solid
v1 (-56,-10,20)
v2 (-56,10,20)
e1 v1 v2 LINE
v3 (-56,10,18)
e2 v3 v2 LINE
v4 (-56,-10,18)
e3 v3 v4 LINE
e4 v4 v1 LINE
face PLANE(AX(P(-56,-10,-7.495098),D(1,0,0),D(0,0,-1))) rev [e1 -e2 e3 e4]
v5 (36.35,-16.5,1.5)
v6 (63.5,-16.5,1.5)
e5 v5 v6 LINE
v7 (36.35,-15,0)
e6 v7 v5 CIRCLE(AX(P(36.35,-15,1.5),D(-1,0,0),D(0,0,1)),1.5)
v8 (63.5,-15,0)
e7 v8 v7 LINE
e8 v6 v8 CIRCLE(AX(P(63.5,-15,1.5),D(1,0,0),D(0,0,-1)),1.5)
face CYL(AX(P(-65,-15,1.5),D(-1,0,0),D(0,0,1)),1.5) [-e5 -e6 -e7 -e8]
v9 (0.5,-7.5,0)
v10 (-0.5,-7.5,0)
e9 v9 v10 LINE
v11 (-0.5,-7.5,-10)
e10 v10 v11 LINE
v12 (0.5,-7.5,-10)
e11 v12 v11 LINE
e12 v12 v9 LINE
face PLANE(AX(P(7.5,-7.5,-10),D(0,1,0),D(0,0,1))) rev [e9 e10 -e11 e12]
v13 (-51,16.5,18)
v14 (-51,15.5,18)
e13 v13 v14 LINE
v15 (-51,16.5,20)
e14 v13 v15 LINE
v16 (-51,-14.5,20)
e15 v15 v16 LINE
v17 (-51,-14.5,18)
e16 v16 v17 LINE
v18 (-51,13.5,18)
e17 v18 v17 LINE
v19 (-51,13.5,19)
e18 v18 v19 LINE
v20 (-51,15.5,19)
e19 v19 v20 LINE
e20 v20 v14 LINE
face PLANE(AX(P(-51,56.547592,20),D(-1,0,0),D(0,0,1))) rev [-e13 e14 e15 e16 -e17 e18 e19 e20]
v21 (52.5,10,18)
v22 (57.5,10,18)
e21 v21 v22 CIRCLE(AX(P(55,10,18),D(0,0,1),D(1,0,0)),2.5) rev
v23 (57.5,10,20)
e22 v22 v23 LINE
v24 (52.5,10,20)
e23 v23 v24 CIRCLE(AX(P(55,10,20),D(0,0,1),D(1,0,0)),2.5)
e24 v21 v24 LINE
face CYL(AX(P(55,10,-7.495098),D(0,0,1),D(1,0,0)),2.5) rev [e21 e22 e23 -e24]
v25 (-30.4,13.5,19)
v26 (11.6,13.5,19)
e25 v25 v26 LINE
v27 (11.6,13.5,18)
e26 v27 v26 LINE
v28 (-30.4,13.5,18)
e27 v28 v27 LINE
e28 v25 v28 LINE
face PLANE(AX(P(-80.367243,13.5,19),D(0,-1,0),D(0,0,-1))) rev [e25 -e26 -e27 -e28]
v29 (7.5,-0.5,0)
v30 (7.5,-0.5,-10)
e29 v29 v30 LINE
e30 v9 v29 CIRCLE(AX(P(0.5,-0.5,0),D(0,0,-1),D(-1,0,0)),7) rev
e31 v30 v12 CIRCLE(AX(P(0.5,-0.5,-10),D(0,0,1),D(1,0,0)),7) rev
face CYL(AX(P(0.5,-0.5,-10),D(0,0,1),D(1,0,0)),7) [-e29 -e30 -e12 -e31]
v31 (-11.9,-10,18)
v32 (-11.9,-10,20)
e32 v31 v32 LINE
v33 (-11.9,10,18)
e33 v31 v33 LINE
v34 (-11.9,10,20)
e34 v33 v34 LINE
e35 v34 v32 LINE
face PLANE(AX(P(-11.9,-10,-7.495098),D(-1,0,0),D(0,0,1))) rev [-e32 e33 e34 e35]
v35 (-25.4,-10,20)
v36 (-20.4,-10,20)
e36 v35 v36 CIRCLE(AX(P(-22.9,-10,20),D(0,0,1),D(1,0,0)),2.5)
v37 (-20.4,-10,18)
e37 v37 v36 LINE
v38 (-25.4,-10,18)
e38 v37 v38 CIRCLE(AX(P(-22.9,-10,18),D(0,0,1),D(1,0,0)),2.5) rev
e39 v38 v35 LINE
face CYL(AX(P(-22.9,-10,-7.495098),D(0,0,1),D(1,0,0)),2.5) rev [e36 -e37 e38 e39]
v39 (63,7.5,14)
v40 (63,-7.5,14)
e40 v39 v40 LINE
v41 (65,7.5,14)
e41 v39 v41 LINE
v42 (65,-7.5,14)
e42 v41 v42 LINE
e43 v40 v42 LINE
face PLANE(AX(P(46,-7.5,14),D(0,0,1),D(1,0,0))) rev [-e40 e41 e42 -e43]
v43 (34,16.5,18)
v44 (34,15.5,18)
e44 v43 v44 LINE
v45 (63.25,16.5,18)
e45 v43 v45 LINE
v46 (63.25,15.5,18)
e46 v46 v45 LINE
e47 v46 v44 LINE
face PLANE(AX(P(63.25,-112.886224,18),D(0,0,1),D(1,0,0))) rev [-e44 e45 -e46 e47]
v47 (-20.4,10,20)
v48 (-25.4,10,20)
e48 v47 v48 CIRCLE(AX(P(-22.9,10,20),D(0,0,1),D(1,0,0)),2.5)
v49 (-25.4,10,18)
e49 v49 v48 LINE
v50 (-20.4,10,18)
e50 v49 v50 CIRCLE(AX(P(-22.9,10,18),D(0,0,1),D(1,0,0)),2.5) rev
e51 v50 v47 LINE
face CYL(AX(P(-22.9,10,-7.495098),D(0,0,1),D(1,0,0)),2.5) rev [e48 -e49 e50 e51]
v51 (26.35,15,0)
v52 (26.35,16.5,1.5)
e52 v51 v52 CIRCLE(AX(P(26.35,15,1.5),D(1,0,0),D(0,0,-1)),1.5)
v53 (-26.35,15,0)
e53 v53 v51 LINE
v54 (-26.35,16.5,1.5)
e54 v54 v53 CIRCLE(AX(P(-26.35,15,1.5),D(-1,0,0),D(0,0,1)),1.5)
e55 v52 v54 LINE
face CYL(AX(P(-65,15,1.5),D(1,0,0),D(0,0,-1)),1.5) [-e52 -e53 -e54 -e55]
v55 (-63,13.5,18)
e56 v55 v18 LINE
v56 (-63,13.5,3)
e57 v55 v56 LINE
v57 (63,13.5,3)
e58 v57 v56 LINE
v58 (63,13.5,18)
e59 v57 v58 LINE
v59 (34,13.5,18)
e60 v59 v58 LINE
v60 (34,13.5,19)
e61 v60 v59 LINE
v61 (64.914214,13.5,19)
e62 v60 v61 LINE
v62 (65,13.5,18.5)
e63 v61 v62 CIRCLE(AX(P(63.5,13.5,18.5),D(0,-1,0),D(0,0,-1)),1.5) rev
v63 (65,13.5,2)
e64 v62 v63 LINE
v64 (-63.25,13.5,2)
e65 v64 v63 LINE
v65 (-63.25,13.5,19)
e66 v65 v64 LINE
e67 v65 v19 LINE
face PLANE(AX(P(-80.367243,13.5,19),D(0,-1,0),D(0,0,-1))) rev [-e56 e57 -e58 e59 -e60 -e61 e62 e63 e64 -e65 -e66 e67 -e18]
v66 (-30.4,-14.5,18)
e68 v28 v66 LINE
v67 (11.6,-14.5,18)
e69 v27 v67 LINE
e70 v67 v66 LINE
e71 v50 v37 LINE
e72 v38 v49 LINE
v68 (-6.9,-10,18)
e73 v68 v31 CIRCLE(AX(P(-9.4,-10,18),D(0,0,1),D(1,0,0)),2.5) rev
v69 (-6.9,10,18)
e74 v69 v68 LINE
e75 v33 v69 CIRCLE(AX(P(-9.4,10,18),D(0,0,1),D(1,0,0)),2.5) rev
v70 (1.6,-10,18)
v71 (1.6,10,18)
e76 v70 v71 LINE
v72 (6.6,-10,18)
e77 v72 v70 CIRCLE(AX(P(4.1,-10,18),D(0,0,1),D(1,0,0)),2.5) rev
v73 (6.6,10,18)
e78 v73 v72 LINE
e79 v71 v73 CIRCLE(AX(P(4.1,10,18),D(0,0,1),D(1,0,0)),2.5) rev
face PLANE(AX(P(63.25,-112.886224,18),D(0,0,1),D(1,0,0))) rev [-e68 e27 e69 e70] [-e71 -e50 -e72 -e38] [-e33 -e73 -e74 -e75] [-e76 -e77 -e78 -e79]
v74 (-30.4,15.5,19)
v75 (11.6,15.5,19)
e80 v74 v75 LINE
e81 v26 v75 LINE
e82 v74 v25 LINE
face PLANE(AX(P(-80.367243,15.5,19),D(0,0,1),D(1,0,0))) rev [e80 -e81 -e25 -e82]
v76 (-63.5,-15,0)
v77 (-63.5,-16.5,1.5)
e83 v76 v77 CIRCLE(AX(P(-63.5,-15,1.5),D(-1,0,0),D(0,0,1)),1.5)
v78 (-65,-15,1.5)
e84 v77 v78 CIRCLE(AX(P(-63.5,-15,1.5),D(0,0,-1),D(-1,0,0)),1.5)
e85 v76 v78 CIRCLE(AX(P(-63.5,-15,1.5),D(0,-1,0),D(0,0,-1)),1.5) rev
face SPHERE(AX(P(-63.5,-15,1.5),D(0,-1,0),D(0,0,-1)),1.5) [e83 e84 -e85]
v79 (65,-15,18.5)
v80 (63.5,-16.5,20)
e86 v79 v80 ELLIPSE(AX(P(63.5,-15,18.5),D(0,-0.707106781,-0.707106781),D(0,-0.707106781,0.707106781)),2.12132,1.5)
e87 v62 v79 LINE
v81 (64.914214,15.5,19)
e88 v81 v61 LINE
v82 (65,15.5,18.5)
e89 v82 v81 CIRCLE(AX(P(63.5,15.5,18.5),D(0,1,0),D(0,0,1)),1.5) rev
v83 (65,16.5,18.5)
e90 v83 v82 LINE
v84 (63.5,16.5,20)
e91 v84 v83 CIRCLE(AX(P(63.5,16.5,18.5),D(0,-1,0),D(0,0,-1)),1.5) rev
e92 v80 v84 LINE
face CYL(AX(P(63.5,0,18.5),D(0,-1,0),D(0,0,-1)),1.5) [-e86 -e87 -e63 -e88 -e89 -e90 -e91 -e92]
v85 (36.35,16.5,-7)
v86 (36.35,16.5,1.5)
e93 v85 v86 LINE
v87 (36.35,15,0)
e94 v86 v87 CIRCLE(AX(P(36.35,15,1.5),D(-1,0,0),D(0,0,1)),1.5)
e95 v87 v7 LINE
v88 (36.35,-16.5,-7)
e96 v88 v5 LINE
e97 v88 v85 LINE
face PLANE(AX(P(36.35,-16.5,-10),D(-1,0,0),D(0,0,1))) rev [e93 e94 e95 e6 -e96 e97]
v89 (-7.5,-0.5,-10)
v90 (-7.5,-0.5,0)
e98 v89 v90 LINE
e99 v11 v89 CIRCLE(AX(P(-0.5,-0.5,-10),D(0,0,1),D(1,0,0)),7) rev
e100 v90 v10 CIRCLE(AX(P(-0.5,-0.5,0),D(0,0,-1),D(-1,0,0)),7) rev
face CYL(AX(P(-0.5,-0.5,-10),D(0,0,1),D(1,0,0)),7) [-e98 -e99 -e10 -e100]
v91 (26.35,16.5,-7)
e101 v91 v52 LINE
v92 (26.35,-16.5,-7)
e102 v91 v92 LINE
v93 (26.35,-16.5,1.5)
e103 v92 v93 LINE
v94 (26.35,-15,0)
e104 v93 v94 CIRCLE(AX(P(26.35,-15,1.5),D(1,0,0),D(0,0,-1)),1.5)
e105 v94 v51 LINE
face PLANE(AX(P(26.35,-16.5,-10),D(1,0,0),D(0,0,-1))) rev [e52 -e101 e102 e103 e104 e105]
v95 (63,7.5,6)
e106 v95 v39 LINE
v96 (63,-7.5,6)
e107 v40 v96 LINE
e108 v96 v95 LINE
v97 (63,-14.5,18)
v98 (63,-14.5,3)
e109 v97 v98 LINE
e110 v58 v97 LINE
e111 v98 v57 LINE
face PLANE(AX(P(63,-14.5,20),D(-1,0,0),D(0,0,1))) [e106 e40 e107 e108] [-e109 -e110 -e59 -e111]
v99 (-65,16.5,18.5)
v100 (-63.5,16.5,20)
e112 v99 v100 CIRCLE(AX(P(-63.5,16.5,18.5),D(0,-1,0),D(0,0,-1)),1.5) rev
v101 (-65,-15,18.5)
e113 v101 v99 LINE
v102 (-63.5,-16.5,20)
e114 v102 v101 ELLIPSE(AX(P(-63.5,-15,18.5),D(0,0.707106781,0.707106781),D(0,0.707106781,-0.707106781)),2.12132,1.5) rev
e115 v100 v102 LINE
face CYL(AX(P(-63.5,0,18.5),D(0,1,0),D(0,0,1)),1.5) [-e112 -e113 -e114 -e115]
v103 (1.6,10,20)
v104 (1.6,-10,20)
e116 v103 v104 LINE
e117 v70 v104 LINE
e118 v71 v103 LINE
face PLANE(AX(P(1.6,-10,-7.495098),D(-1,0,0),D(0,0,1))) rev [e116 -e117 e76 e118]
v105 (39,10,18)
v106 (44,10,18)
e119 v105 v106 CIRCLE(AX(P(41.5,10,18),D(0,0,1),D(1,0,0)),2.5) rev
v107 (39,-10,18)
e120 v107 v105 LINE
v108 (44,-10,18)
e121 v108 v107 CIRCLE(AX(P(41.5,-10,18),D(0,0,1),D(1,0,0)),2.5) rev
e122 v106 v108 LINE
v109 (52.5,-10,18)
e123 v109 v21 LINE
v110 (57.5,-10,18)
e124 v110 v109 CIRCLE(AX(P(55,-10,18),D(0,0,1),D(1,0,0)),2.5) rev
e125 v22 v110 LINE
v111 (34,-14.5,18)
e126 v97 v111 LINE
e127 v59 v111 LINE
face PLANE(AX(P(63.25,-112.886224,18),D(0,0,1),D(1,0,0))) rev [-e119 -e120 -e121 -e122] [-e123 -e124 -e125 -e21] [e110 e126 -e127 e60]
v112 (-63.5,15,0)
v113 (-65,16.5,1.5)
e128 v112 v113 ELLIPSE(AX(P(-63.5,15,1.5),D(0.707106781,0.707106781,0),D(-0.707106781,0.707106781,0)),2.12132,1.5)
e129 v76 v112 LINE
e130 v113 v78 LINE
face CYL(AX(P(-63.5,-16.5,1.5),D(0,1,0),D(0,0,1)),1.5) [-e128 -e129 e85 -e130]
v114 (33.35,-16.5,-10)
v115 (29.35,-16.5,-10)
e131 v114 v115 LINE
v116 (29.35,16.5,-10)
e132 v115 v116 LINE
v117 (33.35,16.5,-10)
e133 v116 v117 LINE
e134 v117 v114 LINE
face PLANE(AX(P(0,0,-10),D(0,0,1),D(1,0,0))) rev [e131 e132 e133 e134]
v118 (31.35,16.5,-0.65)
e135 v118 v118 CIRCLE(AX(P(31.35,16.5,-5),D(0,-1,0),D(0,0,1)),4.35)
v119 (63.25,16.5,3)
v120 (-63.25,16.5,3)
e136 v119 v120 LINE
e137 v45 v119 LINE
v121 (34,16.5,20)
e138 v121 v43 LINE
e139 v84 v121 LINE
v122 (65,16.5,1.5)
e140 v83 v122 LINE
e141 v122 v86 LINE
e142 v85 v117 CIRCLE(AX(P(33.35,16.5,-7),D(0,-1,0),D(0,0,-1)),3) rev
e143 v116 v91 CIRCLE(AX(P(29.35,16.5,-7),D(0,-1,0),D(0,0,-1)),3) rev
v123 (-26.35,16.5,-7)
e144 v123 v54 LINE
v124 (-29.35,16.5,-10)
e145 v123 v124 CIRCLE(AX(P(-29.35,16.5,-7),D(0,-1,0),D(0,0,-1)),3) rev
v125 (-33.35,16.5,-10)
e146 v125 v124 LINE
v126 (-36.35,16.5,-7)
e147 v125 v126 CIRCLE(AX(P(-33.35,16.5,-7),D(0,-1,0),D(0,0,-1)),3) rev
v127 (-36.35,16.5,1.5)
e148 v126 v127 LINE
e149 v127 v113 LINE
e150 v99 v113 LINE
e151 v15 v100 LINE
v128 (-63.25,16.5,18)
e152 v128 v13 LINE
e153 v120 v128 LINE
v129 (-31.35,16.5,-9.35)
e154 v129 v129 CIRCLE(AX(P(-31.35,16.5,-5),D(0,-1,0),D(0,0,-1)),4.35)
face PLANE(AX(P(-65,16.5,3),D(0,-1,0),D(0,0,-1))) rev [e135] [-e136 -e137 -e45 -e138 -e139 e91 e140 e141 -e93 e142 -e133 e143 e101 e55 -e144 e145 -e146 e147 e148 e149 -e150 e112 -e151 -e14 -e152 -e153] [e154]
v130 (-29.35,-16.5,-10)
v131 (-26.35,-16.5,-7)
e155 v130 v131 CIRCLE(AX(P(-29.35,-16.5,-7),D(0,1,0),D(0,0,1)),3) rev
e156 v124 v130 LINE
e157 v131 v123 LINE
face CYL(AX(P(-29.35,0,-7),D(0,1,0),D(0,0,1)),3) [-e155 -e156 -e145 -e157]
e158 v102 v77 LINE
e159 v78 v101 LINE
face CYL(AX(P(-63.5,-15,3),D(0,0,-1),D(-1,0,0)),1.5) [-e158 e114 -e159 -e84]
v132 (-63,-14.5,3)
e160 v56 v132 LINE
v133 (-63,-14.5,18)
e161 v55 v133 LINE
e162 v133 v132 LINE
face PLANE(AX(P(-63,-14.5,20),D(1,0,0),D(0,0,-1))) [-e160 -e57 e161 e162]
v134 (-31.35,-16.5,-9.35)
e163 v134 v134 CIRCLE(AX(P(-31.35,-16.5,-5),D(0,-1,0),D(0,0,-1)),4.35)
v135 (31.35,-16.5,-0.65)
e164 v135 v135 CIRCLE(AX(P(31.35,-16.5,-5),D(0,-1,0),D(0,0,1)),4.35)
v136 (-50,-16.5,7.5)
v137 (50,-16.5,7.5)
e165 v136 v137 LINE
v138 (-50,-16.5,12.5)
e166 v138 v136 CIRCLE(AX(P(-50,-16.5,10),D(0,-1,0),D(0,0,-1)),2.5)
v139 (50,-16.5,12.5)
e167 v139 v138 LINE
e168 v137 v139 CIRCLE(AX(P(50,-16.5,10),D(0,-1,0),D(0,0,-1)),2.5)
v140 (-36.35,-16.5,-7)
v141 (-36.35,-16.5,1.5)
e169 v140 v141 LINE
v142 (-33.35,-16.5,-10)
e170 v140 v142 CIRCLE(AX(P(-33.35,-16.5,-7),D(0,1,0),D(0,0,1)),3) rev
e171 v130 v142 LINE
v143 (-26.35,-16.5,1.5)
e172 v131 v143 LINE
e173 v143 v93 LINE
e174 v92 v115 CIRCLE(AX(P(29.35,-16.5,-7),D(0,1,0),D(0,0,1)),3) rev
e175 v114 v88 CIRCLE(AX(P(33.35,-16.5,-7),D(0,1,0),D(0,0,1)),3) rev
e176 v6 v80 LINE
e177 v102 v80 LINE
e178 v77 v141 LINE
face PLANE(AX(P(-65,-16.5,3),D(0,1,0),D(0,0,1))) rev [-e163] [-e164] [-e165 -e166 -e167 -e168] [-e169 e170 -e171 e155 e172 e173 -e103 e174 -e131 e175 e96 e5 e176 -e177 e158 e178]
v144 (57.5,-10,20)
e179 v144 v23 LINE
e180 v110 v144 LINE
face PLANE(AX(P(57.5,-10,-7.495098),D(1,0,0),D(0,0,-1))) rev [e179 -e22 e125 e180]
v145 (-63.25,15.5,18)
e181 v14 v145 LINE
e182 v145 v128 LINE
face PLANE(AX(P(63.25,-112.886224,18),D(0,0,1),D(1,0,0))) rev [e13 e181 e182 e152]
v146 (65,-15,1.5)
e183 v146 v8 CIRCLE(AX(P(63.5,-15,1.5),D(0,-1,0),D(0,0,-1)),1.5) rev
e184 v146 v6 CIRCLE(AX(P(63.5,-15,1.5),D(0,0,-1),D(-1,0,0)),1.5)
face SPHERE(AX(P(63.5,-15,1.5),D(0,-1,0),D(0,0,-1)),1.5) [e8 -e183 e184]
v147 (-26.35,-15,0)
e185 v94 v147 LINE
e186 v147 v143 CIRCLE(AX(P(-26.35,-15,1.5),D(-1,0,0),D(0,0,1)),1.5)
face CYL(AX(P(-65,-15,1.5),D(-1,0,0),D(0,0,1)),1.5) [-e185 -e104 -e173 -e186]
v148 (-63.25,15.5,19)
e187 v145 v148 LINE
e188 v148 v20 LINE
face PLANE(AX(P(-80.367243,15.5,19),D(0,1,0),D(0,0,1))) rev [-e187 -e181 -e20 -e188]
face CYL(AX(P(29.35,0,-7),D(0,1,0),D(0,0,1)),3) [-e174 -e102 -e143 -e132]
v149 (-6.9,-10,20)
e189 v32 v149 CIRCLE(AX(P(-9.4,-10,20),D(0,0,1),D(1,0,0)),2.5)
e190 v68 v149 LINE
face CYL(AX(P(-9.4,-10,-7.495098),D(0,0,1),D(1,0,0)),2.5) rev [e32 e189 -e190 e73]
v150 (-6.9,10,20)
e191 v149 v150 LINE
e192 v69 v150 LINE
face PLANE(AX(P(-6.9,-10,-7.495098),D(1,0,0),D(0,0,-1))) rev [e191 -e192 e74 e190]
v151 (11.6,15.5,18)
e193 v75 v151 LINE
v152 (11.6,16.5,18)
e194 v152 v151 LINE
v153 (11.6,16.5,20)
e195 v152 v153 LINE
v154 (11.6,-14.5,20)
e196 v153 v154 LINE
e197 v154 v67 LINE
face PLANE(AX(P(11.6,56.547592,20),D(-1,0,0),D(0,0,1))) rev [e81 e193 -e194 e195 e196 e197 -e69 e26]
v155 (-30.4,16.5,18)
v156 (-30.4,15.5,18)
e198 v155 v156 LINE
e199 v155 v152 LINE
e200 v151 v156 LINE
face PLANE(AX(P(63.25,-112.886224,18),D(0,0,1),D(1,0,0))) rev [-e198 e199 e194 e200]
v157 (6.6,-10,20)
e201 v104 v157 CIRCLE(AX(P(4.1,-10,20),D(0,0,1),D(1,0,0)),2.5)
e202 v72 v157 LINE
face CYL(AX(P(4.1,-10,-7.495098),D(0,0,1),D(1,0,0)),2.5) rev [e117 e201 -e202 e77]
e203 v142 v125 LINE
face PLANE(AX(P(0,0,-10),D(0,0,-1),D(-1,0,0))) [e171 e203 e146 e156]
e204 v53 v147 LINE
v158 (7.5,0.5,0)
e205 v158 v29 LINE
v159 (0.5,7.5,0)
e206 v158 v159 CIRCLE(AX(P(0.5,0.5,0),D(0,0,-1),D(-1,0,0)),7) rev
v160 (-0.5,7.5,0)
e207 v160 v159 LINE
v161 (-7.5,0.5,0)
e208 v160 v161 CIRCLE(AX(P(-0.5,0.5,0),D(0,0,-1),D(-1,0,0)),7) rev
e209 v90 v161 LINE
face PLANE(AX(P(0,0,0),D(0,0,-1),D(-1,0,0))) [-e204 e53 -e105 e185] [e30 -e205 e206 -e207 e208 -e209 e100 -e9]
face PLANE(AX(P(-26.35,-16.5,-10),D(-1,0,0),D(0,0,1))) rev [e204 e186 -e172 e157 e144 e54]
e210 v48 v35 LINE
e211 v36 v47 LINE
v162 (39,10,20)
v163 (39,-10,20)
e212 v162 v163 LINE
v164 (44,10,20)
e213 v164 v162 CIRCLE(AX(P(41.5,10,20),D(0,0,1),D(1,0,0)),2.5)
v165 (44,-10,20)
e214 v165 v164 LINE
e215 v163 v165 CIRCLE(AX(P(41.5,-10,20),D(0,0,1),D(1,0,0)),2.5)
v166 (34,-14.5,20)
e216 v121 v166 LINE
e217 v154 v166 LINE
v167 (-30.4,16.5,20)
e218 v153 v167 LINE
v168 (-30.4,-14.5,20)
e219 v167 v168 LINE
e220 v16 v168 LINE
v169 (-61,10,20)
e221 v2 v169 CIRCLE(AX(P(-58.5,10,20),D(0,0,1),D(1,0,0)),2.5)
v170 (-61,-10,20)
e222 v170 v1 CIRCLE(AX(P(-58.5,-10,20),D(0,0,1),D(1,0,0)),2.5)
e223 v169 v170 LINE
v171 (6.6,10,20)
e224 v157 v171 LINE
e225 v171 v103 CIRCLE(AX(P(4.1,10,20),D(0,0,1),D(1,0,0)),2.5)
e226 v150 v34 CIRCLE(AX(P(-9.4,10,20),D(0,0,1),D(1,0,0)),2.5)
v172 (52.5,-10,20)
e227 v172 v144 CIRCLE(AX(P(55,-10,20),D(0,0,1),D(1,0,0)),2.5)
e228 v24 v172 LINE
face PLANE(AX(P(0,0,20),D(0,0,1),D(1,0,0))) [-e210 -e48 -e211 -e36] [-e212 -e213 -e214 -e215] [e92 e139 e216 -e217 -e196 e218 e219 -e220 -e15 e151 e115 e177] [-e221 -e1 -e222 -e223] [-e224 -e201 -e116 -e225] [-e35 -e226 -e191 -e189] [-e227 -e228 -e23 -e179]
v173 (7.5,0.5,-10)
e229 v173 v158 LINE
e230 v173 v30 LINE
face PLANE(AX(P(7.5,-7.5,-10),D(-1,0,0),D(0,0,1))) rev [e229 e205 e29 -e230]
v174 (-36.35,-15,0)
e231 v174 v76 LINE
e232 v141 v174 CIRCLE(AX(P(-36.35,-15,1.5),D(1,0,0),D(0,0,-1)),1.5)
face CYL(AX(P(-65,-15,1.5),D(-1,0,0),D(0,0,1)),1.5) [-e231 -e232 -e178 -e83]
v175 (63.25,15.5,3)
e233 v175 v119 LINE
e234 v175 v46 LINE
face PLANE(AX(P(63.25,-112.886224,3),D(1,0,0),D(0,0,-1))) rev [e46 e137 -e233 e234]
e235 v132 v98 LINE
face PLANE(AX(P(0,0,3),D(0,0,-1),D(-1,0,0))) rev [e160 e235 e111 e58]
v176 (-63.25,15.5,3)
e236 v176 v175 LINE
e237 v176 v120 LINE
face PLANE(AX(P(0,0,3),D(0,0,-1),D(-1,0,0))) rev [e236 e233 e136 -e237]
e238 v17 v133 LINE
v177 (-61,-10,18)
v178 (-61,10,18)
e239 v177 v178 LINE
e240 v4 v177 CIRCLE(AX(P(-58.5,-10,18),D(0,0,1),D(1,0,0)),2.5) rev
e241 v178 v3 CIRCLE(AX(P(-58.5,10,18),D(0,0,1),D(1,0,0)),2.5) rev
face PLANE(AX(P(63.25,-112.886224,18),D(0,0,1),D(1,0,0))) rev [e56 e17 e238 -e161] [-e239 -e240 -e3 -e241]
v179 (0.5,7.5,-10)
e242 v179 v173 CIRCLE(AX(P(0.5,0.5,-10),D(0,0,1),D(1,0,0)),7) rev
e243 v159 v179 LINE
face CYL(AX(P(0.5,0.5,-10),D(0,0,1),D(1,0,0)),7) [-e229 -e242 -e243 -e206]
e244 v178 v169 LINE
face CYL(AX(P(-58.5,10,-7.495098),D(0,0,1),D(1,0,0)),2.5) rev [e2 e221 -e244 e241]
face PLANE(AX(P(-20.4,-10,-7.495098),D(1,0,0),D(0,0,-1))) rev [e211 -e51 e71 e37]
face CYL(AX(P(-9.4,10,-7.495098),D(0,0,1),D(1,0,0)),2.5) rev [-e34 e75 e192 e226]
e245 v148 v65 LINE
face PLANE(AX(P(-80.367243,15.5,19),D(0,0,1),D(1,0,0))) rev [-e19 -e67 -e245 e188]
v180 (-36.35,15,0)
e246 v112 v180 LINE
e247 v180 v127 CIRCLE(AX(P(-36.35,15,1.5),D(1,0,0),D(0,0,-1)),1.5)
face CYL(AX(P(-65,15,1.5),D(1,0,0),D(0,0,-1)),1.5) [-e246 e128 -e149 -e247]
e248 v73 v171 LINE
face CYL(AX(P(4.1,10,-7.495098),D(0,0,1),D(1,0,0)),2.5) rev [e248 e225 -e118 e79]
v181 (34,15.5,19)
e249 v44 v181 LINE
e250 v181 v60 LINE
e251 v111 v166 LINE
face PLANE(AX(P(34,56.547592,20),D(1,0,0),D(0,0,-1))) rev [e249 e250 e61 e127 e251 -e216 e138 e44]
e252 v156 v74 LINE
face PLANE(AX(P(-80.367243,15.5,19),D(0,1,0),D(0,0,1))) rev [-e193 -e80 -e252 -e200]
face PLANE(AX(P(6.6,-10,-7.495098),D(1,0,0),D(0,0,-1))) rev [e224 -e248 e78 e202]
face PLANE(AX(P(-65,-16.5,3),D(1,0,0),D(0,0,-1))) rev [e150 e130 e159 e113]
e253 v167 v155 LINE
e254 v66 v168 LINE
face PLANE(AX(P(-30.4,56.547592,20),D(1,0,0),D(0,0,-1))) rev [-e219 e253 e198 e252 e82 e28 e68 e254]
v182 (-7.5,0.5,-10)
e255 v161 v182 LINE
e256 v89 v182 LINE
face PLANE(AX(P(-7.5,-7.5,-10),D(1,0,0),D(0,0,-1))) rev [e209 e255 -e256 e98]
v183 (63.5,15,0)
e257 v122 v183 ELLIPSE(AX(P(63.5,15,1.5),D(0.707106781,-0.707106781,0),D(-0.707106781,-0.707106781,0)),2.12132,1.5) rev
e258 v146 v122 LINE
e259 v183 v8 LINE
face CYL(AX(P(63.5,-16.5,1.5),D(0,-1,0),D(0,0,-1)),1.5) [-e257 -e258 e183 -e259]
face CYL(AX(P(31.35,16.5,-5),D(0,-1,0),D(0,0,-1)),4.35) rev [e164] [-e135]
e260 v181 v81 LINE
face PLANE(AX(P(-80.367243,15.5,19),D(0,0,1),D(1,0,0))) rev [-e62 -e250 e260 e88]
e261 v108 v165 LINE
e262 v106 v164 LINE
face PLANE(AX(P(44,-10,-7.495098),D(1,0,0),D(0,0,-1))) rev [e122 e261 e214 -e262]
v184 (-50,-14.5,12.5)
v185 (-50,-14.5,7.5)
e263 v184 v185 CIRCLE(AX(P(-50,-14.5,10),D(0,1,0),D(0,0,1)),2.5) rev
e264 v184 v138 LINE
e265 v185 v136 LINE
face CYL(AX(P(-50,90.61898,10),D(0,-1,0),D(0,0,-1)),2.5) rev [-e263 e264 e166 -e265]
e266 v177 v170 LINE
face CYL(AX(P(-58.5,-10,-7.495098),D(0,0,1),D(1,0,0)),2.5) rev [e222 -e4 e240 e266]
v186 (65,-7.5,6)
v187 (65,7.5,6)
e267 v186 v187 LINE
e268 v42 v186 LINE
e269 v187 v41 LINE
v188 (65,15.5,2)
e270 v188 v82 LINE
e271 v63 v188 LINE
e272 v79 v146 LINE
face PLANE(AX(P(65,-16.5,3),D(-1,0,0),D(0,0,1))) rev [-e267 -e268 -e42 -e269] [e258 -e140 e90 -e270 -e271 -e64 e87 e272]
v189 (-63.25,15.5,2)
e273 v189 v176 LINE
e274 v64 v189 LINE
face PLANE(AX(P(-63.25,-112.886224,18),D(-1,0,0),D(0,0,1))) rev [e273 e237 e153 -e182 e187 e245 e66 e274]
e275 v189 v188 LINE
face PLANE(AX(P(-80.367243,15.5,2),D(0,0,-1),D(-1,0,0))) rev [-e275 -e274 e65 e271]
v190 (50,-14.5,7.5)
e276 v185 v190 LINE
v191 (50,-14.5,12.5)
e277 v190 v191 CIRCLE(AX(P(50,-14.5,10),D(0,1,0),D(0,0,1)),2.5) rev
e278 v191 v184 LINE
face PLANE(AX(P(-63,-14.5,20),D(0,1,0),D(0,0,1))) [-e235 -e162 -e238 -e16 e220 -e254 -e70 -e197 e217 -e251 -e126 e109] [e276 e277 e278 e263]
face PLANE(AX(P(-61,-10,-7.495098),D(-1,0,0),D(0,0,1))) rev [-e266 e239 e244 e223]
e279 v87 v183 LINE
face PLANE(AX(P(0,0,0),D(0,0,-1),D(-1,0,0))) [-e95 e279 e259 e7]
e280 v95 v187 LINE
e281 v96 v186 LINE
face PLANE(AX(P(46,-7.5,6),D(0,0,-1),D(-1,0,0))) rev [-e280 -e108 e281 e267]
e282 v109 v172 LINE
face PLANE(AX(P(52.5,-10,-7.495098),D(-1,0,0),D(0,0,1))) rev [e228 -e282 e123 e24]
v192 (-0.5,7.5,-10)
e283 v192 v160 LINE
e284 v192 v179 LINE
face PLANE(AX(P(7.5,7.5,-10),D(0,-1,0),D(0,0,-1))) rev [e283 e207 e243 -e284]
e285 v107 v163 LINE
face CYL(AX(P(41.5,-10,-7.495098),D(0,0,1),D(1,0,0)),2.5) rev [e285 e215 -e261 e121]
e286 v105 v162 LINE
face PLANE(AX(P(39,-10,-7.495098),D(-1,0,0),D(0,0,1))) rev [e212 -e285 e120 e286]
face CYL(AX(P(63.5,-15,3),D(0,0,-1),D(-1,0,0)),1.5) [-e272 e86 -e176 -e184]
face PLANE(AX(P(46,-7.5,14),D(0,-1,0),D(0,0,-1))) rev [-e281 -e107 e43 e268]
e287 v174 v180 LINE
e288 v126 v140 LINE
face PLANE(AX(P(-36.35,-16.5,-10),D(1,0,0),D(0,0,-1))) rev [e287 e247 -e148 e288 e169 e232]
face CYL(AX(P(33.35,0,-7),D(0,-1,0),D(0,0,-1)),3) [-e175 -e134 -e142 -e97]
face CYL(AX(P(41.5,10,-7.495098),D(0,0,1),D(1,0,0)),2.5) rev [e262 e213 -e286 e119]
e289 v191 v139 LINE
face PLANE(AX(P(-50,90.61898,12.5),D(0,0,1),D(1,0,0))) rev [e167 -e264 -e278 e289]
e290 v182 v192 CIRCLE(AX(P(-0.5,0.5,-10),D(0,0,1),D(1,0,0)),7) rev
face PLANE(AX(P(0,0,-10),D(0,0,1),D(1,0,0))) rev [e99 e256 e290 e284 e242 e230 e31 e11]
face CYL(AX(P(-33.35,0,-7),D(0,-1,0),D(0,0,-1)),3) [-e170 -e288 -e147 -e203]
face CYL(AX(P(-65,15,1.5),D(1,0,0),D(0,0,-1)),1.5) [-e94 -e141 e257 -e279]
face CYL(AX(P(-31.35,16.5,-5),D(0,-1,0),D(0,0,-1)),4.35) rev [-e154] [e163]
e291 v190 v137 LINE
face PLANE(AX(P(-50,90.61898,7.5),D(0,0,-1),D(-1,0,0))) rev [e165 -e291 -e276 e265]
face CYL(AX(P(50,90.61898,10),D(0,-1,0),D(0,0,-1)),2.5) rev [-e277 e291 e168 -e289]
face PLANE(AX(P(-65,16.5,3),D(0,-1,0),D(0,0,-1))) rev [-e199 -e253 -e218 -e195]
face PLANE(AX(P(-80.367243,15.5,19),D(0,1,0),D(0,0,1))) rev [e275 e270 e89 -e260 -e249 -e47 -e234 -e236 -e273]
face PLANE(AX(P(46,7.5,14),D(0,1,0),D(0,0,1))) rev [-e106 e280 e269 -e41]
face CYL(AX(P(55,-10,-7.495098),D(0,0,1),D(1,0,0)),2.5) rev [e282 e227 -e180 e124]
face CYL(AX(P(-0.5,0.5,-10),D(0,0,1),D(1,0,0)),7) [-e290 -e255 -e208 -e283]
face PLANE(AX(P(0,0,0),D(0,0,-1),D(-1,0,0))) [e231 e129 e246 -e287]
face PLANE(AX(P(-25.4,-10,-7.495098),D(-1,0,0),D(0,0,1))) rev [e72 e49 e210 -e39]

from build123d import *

# Parameters (mm, degrees)
ESBO_O1_W                = 130
ESBO_O1_H                = 33
RESSALTO_EXTRUS_O1_DEPTH = 3
ESBO_O2_W                = 130
ESBO_O2_H                = 33
ESBO_O2_W_2              = 126
ESBO_O2_H_2              = 29
EXTRUS_O_FINA1_DEPTH     = 17
ESBO_O3_W                = 126.5
ESBO_O3_H                = 15
CORTE_EXTRUS_O1_DEPTH    = 2
ESBO_O4_W                = 8
ESBO_O4_H                = 15
CORTE_EXTRUS_O2_DEPTH    = 2
ESBO_O7_W                = 42
ESBO_O7_H                = 2
ESBO_O7_W_2              = 12
ESBO_O7_W_3              = 29
RESSALTO_EXTRUS_O2_DEPTH = 29
ESBO_O8_W                = 20.6
ESBO_O8_H                = 2
ESBO_O8_W_2              = 22.4
CORTE_EXTRUS_O4_DEPTH    = 2
CORTE_EXTRUS_O3_REACH    = 134.56
ESBO_O5_W                = 17
ESBO_O5_H                = 2
CORTE_EXTRUS_O5_DEPTH    = 2
CORTE_EXTRUS_O6_DEPTH    = 2
ESBO_O11_W               = 10
ESBO_O11_H               = 33
RESSALTO_EXTRUS_O3_DEPTH = 10
ESBO_O12_R               = 4.35
CORTE_EXTRUS_O7_DEPTH    = 76.591004756
ESBO_O13_W               = 15
ESBO_O13_H               = 15
RESSALTO_EXTRUS_O4_DEPTH = 10
FILETE1_R                = 7
FILETE2_R                = 3
FILETE3_R                = 1.5


with BuildPart() as part:
    # Esboço1 → Ressalto-extrusão1 (new body)
    with BuildSketch(Plane.XY):
        Rectangle(ESBO_O1_W, ESBO_O1_H)
    extrude(amount=RESSALTO_EXTRUS_O1_DEPTH)

    # Esboço2 → Extrusão-Fina1 (add)
    with BuildSketch(Plane.XY.offset(3)):
        Rectangle(ESBO_O2_W, ESBO_O2_H)
        Rectangle(ESBO_O2_W_2, ESBO_O2_H_2, mode=Mode.SUBTRACT)
    extrude(amount=EXTRUS_O_FINA1_DEPTH)

    # Esboço3 → Corte-extrusão1 (cut)
    with BuildSketch(Plane(origin=(0, 16.5, 0), x_dir=(1, 0, 0), z_dir=(0, 1, 0))):
        with Locations((0, -10.5)):
            Rectangle(ESBO_O3_W, ESBO_O3_H)
    extrude(amount=-CORTE_EXTRUS_O1_DEPTH, mode=Mode.SUBTRACT)

    # Esboço4 → Corte-extrusão2 (cut)
    with BuildSketch(Plane(origin=(65, 0, 0), x_dir=(0, 0, -1), z_dir=(1, 0, 0))):
        with Locations((-10, 0)):
            Rectangle(ESBO_O4_W, ESBO_O4_H)
    extrude(amount=-CORTE_EXTRUS_O2_DEPTH, mode=Mode.SUBTRACT)

    # Esboço7 → Ressalto-extrusão2 (add)
    with BuildSketch(Plane(origin=(0, -14.5, 0), x_dir=(1, 0, 0), z_dir=(0, 1, 0))):
        with Locations((-9.4, -19)):
            Rectangle(ESBO_O7_W, ESBO_O7_H)
        with Locations((-57, -19)):
            Rectangle(ESBO_O7_W_2, ESBO_O7_H)
        with Locations((48.5, -19)):
            Rectangle(ESBO_O7_W_3, ESBO_O7_H)
    extrude(amount=RESSALTO_EXTRUS_O2_DEPTH)

    # Esboço8 → Corte-extrusão4 (cut)
    with BuildSketch(Plane(origin=(0, 16.5, 0), x_dir=(1, 0, 0), z_dir=(0, 1, 0))):
        with Locations((-40.7, -19)):
            Rectangle(ESBO_O8_W, ESBO_O8_H)
        with Locations((22.8, -19)):
            Rectangle(ESBO_O8_W_2, ESBO_O8_H)
    extrude(amount=-CORTE_EXTRUS_O4_DEPTH, mode=Mode.SUBTRACT)

    # Corte-extrusão3: up to this face of the body (flat: up to its plane)
    corte_extrus_o3_end = Plane(part.part.faces().sort_by_distance((-63.25, 15.5, 10.5))[0])
    # Esboço5 → Corte-extrusão3 (cut, up to the picked face)
    with BuildSketch(Plane(origin=(65, 0, 0), x_dir=(0, 0, -1), z_dir=(1, 0, 0)), mode=Mode.PRIVATE) as corte_extrus_o3_sk1:
        with Locations((-10.5, 14.5)):
            Rectangle(ESBO_O5_W, ESBO_O5_H)
    corte_extrus_o3_tool1 = split(extrude(corte_extrus_o3_sk1.sketch, amount=-CORTE_EXTRUS_O3_REACH, mode=Mode.PRIVATE), bisect_by=corte_extrus_o3_end, keep=Keep.BOTH, mode=Mode.PRIVATE)
    add(corte_extrus_o3_tool1.solids().sort_by(Axis((65, 14.5, 10.5), (-1, 0, 0)))[0], mode=Mode.SUBTRACT)

    # Esboço9 → Corte-extrusão5 (cut)
    with BuildSketch(Plane.XY.offset(20)):
        with BuildLine():
            Line((-61, -10), (-61, 10))
            ThreePointArc((-61, 10), (-58.5, 12.5), (-56, 10))
            Line((-56, 10), (-56, -10))
            ThreePointArc((-56, -10), (-58.5, -12.5), (-61, -10))
        make_face()
        with BuildLine():
            Line((-25.4, -10), (-25.4, 10))
            ThreePointArc((-25.4, 10), (-22.9, 12.5), (-20.4, 10))
            Line((-20.4, 10), (-20.4, -10))
            ThreePointArc((-20.4, -10), (-22.9, -12.5), (-25.4, -10))
        make_face()
        with BuildLine():
            Line((-11.9, -10), (-11.9, 10))
            ThreePointArc((-11.9, 10), (-9.4, 12.5), (-6.9, 10))
            Line((-6.9, 10), (-6.9, -10))
            ThreePointArc((-6.9, -10), (-9.4, -12.5), (-11.9, -10))
        make_face()
        with BuildLine():
            Line((1.6, -10), (1.6, 10))
            ThreePointArc((1.6, 10), (4.1, 12.5), (6.6, 10))
            Line((6.6, 10), (6.6, -10))
            ThreePointArc((6.6, -10), (4.1, -12.5), (1.6, -10))
        make_face()
        with BuildLine():
            Line((39, -10), (39, 10))
            ThreePointArc((39, 10), (41.5, 12.5), (44, 10))
            Line((44, 10), (44, -10))
            ThreePointArc((44, -10), (41.5, -12.5), (39, -10))
        make_face()
        with BuildLine():
            Line((52.5, -10), (52.5, 10))
            ThreePointArc((52.5, 10), (55, 12.5), (57.5, 10))
            Line((57.5, 10), (57.5, -10))
            ThreePointArc((57.5, -10), (55, -12.5), (52.5, -10))
        make_face()
    extrude(amount=-CORTE_EXTRUS_O5_DEPTH, mode=Mode.SUBTRACT)

    # Esboço10 → Corte-extrusão6 (cut)
    with BuildSketch(Plane.XZ.offset(16.5)):
        with BuildLine():
            Line((-50, 12.5), (50, 12.5))
            ThreePointArc((50, 12.5), (52.5, 10), (50, 7.5))
            Line((50, 7.5), (-50, 7.5))
            ThreePointArc((-50, 7.5), (-52.5, 10), (-50, 12.5))
        make_face()
    extrude(amount=-CORTE_EXTRUS_O6_DEPTH, mode=Mode.SUBTRACT)

    # Esboço11 → Ressalto-extrusão3 (add)
    with BuildSketch(Plane(origin=(0, 0, 0), x_dir=(-1, 0, 0), z_dir=(0, 0, -1))):
        with Locations((-31.35, 0)):
            Rectangle(ESBO_O11_W, ESBO_O11_H)
        with Locations((31.35, 0)):
            Rectangle(ESBO_O11_W, ESBO_O11_H)
    extrude(amount=RESSALTO_EXTRUS_O3_DEPTH)

    # Esboço12 → Corte-extrusão7 (cut, through all)
    with BuildSketch(Plane.XZ.offset(16.5)):
        with Locations(Location((-31.35, -5, 0), (0, 0, 270))):
            Circle(ESBO_O12_R)
        with Locations(Location((31.35, -5, 0), (0, 0, 90))):
            Circle(ESBO_O12_R)
    extrude(amount=-CORTE_EXTRUS_O7_DEPTH, mode=Mode.SUBTRACT)

    # Esboço13 → Ressalto-extrusão4 (add)
    with BuildSketch(Plane(origin=(0, 0, 0), x_dir=(-1, 0, 0), z_dir=(0, 0, -1))):
        Rectangle(ESBO_O13_W, ESBO_O13_H)
    extrude(amount=RESSALTO_EXTRUS_O4_DEPTH)

    # Filete1
    filete1_edges = [part.edges().sort_by_distance(p)[0] for p in [
        (-7.5, -7.5, -5),
        (-7.5, 7.5, -5),
        (7.5, 7.5, -5),
        (7.5, -7.5, -5),
    ]]
    fillet(filete1_edges, radius=FILETE1_R)

    # Filete2
    filete2_edges = [part.edges().sort_by_distance(p)[0] for p in [
        (26.35, 0, -10),
        (36.35, 0, -10),
        (-36.35, 0, -10),
        (-26.35, 0, -10),
    ]]
    fillet(filete2_edges, radius=FILETE2_R)

    # Filete3
    # the kernel refuses this fillet: 1.5 mm, written as the material it takes off along each edge
    with BuildSketch(Plane(origin=(63.5, -15, 1.5), x_dir=(0, -1, 0), z_dir=(1, 0, 0))) as filete3_piece_1_section:
        Polygon((0, 0), (FILETE3_R, 0), (FILETE3_R, FILETE3_R), (0, FILETE3_R), align=None)
    filete3_piece_1 = extrude(amount=FILETE3_R, mode=Mode.PRIVATE)
    filete3_piece_1 = filete3_piece_1 - Plane(origin=(63.5, -15, 1.5), x_dir=(0, 0.7071067811865475, 0.7071067811865475), z_dir=(1, 0, 0)) * Sphere(FILETE3_R, mode=Mode.PRIVATE)
    add(filete3_piece_1, mode=Mode.SUBTRACT)
    with BuildSketch(Plane(origin=(-63.5, -15, 1.5), x_dir=(0, -1, 0), z_dir=(-1, 0, 0))) as filete3_piece_2_section:
        Polygon((0, 0), (FILETE3_R, 0), (FILETE3_R, -FILETE3_R), (0, -FILETE3_R), align=None)
    filete3_piece_2 = extrude(amount=FILETE3_R, mode=Mode.PRIVATE)
    filete3_piece_2 = filete3_piece_2 - Plane(origin=(-63.5, -15, 1.5), x_dir=(0, 0.7071067811865475, 0.7071067811865475), z_dir=(-1, 0, 0)) * Sphere(FILETE3_R, mode=Mode.PRIVATE)
    add(filete3_piece_2, mode=Mode.SUBTRACT)
    with BuildSketch(Plane(origin=(68.75, 16.5, 0), x_dir=(0, 0, 1), z_dir=(-1, 0, 0)), Plane(origin=(-36.35, 16.5, 0), x_dir=(0, 0, 1), z_dir=(-1, 0, 0))) as filete3_piece_3:
        with BuildLine():
            CenterArc((FILETE3_R, -FILETE3_R), FILETE3_R, 90, 90)
            Line((0, -FILETE3_R), (0, 0))
            Line((0, 0), (FILETE3_R, 0))
        make_face()
    extrude(amount=32.4, mode=Mode.SUBTRACT)
    with BuildSketch(Plane(origin=(26.35, 16.5, 0), x_dir=(0, 0, 1), z_dir=(-1, 0, 0))) as filete3_piece_4:
        with BuildLine():
            CenterArc((FILETE3_R, -FILETE3_R), FILETE3_R, 90, 90)
            Line((0, -FILETE3_R), (0, 0))
            Line((0, 0), (FILETE3_R, 0))
        make_face()
    extrude(amount=52.7, mode=Mode.SUBTRACT)
    with BuildSketch(Plane(origin=(65, -15, 0), x_dir=(-1, 0, 0), z_dir=(0, 1, 0)), Plane(origin=(-65, 20.25, 0), x_dir=(1, 0, 0), z_dir=(0, -1, 0))) as filete3_piece_5:
        with BuildLine():
            CenterArc((FILETE3_R, FILETE3_R), FILETE3_R, 180, 90)
            Line((0, FILETE3_R), (0, 0))
            Line((0, 0), (FILETE3_R, 0))
        make_face()
    extrude(amount=35.25, mode=Mode.SUBTRACT)
    with BuildSketch(Plane(origin=(65, -16.5, 1.5), x_dir=(-1, 0, 0), z_dir=(0, 0, 1)), Plane(origin=(-65, -16.5, 23.75), x_dir=(1, 0, 0), z_dir=(0, 0, -1))) as filete3_piece_6:
        with BuildLine():
            CenterArc((FILETE3_R, -FILETE3_R), FILETE3_R, 90, 90)
            Line((0, -FILETE3_R), (0, 0))
            Line((0, 0), (FILETE3_R, 0))
        make_face()
    extrude(amount=22.25, mode=Mode.SUBTRACT)
    with BuildSketch(Plane(origin=(65, -20.25, 20), x_dir=(0, 0, -1), z_dir=(0, 1, 0))) as filete3_piece_7:
        with BuildLine():
            CenterArc((FILETE3_R, FILETE3_R), FILETE3_R, 180, 90)
            Line((0, FILETE3_R), (0, 0))
            Line((0, 0), (FILETE3_R, 0))
        make_face()
    extrude(amount=40.5, mode=Mode.SUBTRACT)
    with BuildSketch(Plane(origin=(-65, 20.25, 20), x_dir=(1, 0, 0), z_dir=(0, -1, 0))) as filete3_piece_8:
        with BuildLine():
            CenterArc((FILETE3_R, -FILETE3_R), FILETE3_R, 90, 90)
            Line((0, -FILETE3_R), (0, 0))
            Line((0, 0), (FILETE3_R, 0))
        make_face()
    extrude(amount=40.5, mode=Mode.SUBTRACT)
    with BuildSketch(Plane(origin=(36.35, -16.5, 0), x_dir=(0, 0, 1), z_dir=(1, 0, 0)), Plane(origin=(-63.5, -16.5, 0), x_dir=(0, 0, 1), z_dir=(1, 0, 0))) as filete3_piece_9:
        with BuildLine():
            CenterArc((FILETE3_R, -FILETE3_R), FILETE3_R, 90, 90)
            Line((0, -FILETE3_R), (0, 0))
            Line((0, 0), (FILETE3_R, 0))
        make_face()
    extrude(amount=27.15, mode=Mode.SUBTRACT)
    with BuildSketch(Plane(origin=(-26.35, -16.5, 0), x_dir=(0, 1, 0), z_dir=(1, 0, 0))) as filete3_piece_10:
        with BuildLine():
            CenterArc((FILETE3_R, FILETE3_R), FILETE3_R, 180, 90)
            Line((0, FILETE3_R), (0, 0))
            Line((0, 0), (FILETE3_R, 0))
        make_face()
    extrude(amount=52.7, mode=Mode.SUBTRACT)


solid = part.part
